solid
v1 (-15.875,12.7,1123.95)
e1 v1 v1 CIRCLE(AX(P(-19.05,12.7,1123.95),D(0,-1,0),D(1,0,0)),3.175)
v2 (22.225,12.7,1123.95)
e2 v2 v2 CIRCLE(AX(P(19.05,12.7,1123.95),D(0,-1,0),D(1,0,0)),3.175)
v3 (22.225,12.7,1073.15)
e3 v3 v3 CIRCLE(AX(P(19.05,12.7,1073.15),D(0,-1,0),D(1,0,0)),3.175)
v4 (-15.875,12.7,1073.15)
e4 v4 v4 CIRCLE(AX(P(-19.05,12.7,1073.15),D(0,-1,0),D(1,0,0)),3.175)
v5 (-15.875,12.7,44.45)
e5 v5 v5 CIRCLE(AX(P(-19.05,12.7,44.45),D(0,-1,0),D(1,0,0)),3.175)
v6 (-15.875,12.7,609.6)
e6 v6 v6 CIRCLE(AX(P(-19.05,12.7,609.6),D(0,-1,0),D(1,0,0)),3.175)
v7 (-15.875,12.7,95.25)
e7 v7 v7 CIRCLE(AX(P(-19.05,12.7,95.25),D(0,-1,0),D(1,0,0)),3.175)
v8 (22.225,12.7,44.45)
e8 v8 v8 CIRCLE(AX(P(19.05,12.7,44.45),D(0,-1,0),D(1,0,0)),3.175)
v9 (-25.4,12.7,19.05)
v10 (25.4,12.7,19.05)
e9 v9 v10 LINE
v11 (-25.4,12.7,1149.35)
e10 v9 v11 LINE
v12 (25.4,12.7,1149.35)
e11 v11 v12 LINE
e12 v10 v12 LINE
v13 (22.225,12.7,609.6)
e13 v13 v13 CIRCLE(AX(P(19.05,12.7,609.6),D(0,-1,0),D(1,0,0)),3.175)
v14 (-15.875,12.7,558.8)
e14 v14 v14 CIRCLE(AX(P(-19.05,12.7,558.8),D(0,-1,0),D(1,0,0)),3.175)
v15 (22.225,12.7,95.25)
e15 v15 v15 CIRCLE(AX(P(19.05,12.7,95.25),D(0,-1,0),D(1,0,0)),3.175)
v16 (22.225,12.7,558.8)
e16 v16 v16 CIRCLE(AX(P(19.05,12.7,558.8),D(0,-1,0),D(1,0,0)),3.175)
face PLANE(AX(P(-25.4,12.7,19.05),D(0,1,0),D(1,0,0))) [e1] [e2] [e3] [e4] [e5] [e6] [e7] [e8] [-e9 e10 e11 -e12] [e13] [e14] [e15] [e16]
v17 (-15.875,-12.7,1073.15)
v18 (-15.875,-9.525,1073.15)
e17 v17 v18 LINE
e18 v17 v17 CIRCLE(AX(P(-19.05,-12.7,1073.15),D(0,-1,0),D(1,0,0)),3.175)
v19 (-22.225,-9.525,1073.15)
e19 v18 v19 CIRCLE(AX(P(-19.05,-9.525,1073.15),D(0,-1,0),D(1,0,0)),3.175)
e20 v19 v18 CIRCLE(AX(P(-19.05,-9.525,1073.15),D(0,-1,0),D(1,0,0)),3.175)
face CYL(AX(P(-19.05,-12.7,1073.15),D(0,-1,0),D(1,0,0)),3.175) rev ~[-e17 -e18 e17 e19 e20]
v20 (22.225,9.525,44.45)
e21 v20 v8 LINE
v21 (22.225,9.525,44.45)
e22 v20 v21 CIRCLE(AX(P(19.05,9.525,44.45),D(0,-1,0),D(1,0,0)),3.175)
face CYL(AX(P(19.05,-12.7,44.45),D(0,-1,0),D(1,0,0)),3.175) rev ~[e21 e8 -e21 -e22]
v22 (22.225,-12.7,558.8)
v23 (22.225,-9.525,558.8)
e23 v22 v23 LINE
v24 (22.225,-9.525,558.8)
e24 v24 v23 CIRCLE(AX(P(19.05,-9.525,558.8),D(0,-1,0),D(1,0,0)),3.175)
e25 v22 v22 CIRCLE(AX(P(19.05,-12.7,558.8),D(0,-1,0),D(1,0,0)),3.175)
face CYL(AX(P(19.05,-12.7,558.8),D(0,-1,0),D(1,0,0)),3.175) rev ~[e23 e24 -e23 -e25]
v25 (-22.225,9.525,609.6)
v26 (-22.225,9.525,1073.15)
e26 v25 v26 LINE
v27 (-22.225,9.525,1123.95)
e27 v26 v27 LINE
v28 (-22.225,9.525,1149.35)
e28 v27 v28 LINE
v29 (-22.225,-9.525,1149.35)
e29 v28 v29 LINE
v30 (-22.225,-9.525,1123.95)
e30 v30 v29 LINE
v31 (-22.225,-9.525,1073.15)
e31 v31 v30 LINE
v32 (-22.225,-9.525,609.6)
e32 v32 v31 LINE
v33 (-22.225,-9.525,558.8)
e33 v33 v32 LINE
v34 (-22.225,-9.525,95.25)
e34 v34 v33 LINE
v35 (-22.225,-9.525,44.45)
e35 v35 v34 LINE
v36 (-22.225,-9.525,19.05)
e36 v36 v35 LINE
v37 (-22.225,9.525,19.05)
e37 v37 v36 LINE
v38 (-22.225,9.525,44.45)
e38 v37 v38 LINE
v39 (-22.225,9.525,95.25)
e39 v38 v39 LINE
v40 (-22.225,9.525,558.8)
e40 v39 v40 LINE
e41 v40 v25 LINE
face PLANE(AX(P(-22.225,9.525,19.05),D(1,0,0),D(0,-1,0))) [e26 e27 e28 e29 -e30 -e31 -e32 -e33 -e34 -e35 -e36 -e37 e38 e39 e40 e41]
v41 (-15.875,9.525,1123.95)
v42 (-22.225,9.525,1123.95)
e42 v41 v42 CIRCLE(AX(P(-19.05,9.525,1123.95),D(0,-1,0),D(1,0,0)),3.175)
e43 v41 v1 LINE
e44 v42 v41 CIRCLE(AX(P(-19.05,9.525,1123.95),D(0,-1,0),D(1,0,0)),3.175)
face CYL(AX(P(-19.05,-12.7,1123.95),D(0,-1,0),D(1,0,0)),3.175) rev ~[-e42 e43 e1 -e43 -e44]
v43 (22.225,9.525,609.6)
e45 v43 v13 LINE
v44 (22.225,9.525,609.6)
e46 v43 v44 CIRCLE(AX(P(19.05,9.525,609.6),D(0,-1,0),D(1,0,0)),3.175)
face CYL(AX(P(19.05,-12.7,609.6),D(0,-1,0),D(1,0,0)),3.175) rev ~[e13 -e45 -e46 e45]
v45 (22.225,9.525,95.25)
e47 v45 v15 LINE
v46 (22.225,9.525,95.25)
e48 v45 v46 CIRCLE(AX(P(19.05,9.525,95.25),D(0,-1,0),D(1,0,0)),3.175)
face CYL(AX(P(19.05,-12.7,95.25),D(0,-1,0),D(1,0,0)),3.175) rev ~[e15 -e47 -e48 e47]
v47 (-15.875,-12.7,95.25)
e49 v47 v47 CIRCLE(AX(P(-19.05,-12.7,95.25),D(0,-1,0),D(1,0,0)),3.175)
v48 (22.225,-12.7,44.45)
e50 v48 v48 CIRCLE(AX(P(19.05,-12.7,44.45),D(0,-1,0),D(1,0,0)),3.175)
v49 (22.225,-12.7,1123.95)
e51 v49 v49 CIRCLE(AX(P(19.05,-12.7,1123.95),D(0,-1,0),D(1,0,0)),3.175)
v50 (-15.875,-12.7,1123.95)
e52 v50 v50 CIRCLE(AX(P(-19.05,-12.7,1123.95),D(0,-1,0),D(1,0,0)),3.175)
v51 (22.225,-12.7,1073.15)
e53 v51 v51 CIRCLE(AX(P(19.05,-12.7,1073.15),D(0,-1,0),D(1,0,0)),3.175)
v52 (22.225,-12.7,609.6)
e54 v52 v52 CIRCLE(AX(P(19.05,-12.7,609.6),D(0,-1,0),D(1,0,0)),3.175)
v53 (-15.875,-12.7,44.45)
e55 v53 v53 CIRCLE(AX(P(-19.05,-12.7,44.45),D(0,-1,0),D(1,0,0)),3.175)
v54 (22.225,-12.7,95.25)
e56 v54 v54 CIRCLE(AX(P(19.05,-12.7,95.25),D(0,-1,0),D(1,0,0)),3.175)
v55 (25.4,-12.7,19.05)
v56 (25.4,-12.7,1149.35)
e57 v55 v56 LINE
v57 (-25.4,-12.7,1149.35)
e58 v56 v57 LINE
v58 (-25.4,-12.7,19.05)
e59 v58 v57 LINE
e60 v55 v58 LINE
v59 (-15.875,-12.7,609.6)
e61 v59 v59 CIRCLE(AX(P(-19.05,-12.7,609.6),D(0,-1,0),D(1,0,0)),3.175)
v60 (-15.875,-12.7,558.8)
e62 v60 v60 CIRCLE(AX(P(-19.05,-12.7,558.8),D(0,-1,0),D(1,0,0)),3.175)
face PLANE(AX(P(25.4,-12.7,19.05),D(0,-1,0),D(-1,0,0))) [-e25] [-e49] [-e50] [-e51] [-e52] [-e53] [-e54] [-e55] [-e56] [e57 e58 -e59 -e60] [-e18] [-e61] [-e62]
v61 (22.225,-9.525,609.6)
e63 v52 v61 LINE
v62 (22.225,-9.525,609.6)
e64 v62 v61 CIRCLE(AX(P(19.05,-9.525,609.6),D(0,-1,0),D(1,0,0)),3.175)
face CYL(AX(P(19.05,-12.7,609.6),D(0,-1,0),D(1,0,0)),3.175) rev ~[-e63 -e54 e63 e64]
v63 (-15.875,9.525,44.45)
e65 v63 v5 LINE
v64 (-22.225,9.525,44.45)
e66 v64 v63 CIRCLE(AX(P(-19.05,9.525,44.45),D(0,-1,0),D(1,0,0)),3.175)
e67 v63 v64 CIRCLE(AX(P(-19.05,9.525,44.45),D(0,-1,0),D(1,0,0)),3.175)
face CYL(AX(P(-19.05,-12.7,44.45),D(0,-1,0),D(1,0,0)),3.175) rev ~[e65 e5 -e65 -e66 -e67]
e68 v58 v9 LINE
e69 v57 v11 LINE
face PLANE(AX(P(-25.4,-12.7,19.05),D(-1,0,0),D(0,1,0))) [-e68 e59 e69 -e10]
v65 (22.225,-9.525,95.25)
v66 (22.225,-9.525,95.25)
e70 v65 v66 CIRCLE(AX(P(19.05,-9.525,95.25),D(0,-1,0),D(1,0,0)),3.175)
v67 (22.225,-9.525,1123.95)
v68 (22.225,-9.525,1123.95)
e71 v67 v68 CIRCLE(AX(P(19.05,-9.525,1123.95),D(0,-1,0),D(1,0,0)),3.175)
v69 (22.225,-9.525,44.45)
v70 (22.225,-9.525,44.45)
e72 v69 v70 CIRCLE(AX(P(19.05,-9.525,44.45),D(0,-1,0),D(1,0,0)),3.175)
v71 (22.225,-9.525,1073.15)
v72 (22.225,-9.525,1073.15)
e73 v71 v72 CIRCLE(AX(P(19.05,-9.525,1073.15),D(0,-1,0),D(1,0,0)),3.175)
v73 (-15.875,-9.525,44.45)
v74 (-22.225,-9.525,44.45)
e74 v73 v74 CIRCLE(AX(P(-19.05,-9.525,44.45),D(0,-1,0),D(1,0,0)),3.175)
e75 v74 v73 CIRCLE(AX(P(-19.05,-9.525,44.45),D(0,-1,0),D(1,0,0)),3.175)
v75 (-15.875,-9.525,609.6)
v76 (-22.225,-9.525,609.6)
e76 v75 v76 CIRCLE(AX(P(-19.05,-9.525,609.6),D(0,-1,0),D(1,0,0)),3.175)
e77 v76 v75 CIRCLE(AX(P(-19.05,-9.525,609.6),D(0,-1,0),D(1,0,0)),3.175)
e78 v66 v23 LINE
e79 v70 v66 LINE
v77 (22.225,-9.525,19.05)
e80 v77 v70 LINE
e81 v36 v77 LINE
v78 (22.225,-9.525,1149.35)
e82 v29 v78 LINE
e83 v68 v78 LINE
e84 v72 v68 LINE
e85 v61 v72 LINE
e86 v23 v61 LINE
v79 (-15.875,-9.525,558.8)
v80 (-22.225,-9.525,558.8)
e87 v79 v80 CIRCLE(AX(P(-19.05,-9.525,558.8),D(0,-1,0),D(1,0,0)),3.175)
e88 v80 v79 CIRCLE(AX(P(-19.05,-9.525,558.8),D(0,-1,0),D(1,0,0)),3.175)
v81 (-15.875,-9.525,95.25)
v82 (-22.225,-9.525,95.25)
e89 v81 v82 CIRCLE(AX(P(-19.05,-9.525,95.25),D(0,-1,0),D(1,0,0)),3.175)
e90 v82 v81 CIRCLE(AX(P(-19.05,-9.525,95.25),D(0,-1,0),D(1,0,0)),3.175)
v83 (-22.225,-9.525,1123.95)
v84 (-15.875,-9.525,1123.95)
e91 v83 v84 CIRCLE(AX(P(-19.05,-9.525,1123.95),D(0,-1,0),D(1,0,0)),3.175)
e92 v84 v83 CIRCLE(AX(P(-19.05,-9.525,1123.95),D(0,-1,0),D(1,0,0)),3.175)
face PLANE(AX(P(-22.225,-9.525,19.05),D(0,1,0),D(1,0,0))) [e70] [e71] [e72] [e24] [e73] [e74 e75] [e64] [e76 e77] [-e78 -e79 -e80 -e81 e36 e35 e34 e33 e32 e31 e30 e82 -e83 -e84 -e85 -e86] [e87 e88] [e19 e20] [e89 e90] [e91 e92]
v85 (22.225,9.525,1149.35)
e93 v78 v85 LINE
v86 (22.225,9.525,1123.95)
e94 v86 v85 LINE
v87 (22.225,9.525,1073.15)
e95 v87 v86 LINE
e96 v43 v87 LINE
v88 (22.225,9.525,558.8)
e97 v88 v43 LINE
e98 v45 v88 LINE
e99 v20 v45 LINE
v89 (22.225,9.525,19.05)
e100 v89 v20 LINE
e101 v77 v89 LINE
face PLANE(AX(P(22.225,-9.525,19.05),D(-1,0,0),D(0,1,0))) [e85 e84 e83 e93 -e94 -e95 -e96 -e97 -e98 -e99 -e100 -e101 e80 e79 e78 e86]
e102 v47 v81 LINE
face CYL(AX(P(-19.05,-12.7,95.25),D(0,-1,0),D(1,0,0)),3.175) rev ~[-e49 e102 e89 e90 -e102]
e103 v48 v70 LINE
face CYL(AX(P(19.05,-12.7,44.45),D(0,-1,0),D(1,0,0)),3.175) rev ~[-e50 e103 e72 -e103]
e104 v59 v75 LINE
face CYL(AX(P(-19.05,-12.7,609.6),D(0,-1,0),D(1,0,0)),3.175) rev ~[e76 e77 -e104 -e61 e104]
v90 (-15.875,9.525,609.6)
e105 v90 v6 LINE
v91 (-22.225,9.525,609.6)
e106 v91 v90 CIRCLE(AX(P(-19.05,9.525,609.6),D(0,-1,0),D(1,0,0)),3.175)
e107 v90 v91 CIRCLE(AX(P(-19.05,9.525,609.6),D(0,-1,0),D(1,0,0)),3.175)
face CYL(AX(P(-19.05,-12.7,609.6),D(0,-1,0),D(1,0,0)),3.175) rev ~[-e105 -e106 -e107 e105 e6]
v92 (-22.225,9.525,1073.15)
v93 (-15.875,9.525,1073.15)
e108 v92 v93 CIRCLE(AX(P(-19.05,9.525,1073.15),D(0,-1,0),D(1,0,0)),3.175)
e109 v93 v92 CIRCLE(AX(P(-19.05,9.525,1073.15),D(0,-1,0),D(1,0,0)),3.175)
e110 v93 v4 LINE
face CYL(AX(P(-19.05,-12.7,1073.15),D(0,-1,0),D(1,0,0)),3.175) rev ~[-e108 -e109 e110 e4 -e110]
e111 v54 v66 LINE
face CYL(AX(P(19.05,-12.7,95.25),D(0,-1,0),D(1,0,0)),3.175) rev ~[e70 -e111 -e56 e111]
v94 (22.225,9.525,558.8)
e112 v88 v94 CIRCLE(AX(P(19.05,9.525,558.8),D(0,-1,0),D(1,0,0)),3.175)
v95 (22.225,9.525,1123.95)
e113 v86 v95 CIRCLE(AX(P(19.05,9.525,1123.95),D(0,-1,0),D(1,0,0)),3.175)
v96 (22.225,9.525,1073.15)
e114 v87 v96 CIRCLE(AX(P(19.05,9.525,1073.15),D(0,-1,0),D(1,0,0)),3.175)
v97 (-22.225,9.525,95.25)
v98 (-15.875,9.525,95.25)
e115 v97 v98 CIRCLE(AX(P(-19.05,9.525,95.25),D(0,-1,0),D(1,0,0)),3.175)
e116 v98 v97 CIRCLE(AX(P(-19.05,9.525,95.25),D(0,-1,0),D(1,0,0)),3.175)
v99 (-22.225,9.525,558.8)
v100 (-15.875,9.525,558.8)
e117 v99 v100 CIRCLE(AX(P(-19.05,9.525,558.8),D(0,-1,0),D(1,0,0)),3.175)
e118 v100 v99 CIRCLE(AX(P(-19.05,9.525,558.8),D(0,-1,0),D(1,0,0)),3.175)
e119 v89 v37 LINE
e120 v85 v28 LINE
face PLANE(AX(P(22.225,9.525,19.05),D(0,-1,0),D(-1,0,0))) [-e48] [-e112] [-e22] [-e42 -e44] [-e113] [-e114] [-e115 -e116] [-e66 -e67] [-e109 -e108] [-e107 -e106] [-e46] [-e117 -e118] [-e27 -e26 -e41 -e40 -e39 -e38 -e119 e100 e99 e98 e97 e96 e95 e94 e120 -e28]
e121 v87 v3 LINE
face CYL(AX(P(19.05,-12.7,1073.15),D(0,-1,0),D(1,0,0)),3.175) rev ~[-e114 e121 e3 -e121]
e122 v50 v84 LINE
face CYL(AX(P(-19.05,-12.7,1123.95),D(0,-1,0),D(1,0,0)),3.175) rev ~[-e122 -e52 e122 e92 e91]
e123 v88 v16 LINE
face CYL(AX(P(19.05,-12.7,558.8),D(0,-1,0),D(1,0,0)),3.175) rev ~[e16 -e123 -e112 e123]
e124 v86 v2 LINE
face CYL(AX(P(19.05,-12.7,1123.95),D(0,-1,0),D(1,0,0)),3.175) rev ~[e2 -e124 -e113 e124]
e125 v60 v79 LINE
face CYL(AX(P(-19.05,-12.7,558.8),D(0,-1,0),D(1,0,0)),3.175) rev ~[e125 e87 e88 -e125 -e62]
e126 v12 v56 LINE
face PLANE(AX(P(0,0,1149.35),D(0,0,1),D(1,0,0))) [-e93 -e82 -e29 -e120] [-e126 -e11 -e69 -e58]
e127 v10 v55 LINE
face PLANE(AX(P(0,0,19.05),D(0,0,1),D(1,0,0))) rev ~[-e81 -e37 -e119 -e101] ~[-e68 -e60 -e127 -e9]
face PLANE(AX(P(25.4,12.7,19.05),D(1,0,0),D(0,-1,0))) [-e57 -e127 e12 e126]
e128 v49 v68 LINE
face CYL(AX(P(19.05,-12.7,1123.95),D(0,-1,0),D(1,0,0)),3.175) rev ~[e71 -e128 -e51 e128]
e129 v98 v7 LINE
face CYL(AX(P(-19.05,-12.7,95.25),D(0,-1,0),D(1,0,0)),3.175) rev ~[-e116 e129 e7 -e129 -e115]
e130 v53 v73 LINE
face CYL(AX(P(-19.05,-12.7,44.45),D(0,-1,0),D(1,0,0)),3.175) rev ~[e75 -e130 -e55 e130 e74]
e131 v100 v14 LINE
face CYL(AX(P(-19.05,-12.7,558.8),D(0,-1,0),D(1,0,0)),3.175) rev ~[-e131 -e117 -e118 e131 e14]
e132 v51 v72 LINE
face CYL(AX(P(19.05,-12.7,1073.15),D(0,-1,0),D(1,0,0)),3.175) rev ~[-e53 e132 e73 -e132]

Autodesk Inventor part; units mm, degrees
sketch "Caster Mount Pattern" plane through (0, 0, 0) normal (0, 0, 1) x (1, 0, 0)
  line L0 (-94.6641, 118.7787) -> (-56.5641, 118.7787) construction
  line L1 (-56.5641, 118.7787) -> (-56.5641, 67.9787) construction
  line L2 (-56.5641, 67.9787) -> (-94.6641, 67.9787) construction
  line L3 (-94.6641, 67.9787) -> (-94.6641, 118.7787) construction
  circle A0 centre (-94.6641, 118.7787) radius 3.175
  circle A1 centre (-56.5641, 118.7787) radius 3.175
  circle A2 centre (-56.5641, 67.9787) radius 3.175
  circle A3 centre (-94.6641, 67.9787) radius 3.175
  point P0 (-75.6141, 93.3787)
  dimension "d11" = 6.35
  dimension "d12" = 38.1
  dimension "d13" = 50.8
ref_plane "Start Plane" through (0, 0, 19.05) normal (0, 0, 1) x (1, 0, 0)
ref_plane "End Plane" through (0, 0, 1149.35) normal (0, 0, 1) x (1, 0, 0)
sketch "Sketch" plane through (0, 0, 0) normal (0, 0, 1) x (1, 0, 0)
  line L0 (-25.4, 12.7) -> (25.4, 12.7)
  line L1 (25.4, 12.7) -> (25.4, -12.7)
  line L2 (25.4, -12.7) -> (-25.4, -12.7)
  line L3 (-25.4, -12.7) -> (-25.4, 12.7)
  line L4 (22.225, 9.525) -> (-22.225, 9.525)
  line L5 (-22.225, 9.525) -> (-22.225, -9.525)
  line L6 (-22.225, -9.525) -> (22.225, -9.525)
  line L7 (22.225, -9.525) -> (22.225, 9.525)
  point P0 (0, 0)
  point P1 (0, 12.7)
  point P2 (-25.4, 0)
  dimension "d0" = 50.8
  dimension "d1" = 25.4
  dimension "d2" = 3.175
extrude "Body" add sketch "Sketch" along normal up to surface (1130.3 mm away) from surface at 19.05
sketch "Sketch2" plane through (0, 0, 0) normal (0, 0, 1) x (1, 0, 0)
  line L0 (0, 0) -> (10, 0)
ref_plane "Work Plane3" through (0, 0, 0) normal (0, -1, 0) x (1, 0, 0)
sketch "Sketch3" plane through (0, 0, 0) normal (0, -1, 0) x (1, 0, 0)
  line L0 (-2, 19.05) -> (12, 19.05)
  line L1 (-2, 1149.35) -> (12, 1149.35)
  dimension "d10" = 1130.3
ref_plane "Work Plane4" through (-6.35, -19.05, 19.05) normal (0, 0, -1) x (-1, 0, 0)
split "Split1" plane through (-6.35, -19.05, 19.05) removes the side toward (0, 0, -1)
ref_plane "Work Plane5" through (755.65, -19.05, 1149.35) normal (0, 0, 1) x (1, 0, 0)
split "Split2" plane through (755.65, -19.05, 1149.35) removes the side toward (0, 0, 1)
sketch "Sketch4" plane through (-25.4, -12.7, 19.05) normal (0, -1, 0) x (1, 0, 0)
  line L0 (50.8, 0) -> (0, 0) projected
  line L1 (50.8, 0) -> (50.8, 1130.3) projected
  line L2 (50.8, 1130.3) -> (0, 1130.3) projected
  line L3 (6.35, 76.2) -> (44.45, 76.2) construction
  line L4 (44.45, 76.2) -> (44.45, 25.4) construction
  line L5 (44.45, 25.4) -> (6.35, 25.4) construction
  line L6 (6.35, 25.4) -> (6.35, 76.2) construction
  circle A0 centre (6.35, 76.2) radius 3.175
  circle A1 centre (44.45, 76.2) radius 3.175
  circle A2 centre (44.45, 25.4) radius 3.175
  circle A3 centre (6.35, 25.4) radius 3.175
  line L7 (6.35, 590.55) -> (44.45, 590.55) construction
  line L8 (44.45, 590.55) -> (44.45, 539.75) construction
  line L9 (44.45, 539.75) -> (6.35, 539.75) construction
  line L10 (6.35, 539.75) -> (6.35, 590.55) construction
  circle A4 centre (6.35, 590.55) radius 3.175
  circle A5 centre (44.45, 590.55) radius 3.175
  circle A6 centre (44.45, 539.75) radius 3.175
  circle A7 centre (6.35, 539.75) radius 3.175
  line L11 (6.35, 1104.9) -> (44.45, 1104.9) construction
  line L12 (44.45, 1104.9) -> (44.45, 1054.1) construction
  line L13 (44.45, 1054.1) -> (6.35, 1054.1) construction
  line L14 (6.35, 1054.1) -> (6.35, 1104.9) construction
  circle A8 centre (6.35, 1104.9) radius 3.175
  circle A9 centre (44.45, 1104.9) radius 3.175
  circle A10 centre (44.45, 1054.1) radius 3.175
  circle A11 centre (6.35, 1054.1) radius 3.175
  point P0 (25.4, -19.05)
  point P1 (25.4, 76.2)
  point P2 (25.4, 539.75)
  point P3 (25.4, 590.55)
  point P4 (25.4, 1054.1)
  point P5 (25.4, 25.4)
  point P6 (25.4, 0)
  point P7 (50.8, 565.15)
  point P8 (44.45, 565.15)
  dimension "d14" = 25.4
  dimension "d15" = 25.4
extrude "Extrusion3" cut sketch "Sketch4" against normal up to surface (25.4 mm away)
equation "\"d15\" = d14"
equation "\"G_OFFSET_START\" = -19.05"
equation "\"G_OFFSET_END\" = -19.05"
equation "\"d5\" = -G_OFFSET_START"
equation "\"d6\" = length + G_OFFSET_END"
equation "\"G_L\" = 1130.3"
equation "\"length\" = 1168.4"
properties part number "2x1x.125 Tube" material "Aluminum-6061"
